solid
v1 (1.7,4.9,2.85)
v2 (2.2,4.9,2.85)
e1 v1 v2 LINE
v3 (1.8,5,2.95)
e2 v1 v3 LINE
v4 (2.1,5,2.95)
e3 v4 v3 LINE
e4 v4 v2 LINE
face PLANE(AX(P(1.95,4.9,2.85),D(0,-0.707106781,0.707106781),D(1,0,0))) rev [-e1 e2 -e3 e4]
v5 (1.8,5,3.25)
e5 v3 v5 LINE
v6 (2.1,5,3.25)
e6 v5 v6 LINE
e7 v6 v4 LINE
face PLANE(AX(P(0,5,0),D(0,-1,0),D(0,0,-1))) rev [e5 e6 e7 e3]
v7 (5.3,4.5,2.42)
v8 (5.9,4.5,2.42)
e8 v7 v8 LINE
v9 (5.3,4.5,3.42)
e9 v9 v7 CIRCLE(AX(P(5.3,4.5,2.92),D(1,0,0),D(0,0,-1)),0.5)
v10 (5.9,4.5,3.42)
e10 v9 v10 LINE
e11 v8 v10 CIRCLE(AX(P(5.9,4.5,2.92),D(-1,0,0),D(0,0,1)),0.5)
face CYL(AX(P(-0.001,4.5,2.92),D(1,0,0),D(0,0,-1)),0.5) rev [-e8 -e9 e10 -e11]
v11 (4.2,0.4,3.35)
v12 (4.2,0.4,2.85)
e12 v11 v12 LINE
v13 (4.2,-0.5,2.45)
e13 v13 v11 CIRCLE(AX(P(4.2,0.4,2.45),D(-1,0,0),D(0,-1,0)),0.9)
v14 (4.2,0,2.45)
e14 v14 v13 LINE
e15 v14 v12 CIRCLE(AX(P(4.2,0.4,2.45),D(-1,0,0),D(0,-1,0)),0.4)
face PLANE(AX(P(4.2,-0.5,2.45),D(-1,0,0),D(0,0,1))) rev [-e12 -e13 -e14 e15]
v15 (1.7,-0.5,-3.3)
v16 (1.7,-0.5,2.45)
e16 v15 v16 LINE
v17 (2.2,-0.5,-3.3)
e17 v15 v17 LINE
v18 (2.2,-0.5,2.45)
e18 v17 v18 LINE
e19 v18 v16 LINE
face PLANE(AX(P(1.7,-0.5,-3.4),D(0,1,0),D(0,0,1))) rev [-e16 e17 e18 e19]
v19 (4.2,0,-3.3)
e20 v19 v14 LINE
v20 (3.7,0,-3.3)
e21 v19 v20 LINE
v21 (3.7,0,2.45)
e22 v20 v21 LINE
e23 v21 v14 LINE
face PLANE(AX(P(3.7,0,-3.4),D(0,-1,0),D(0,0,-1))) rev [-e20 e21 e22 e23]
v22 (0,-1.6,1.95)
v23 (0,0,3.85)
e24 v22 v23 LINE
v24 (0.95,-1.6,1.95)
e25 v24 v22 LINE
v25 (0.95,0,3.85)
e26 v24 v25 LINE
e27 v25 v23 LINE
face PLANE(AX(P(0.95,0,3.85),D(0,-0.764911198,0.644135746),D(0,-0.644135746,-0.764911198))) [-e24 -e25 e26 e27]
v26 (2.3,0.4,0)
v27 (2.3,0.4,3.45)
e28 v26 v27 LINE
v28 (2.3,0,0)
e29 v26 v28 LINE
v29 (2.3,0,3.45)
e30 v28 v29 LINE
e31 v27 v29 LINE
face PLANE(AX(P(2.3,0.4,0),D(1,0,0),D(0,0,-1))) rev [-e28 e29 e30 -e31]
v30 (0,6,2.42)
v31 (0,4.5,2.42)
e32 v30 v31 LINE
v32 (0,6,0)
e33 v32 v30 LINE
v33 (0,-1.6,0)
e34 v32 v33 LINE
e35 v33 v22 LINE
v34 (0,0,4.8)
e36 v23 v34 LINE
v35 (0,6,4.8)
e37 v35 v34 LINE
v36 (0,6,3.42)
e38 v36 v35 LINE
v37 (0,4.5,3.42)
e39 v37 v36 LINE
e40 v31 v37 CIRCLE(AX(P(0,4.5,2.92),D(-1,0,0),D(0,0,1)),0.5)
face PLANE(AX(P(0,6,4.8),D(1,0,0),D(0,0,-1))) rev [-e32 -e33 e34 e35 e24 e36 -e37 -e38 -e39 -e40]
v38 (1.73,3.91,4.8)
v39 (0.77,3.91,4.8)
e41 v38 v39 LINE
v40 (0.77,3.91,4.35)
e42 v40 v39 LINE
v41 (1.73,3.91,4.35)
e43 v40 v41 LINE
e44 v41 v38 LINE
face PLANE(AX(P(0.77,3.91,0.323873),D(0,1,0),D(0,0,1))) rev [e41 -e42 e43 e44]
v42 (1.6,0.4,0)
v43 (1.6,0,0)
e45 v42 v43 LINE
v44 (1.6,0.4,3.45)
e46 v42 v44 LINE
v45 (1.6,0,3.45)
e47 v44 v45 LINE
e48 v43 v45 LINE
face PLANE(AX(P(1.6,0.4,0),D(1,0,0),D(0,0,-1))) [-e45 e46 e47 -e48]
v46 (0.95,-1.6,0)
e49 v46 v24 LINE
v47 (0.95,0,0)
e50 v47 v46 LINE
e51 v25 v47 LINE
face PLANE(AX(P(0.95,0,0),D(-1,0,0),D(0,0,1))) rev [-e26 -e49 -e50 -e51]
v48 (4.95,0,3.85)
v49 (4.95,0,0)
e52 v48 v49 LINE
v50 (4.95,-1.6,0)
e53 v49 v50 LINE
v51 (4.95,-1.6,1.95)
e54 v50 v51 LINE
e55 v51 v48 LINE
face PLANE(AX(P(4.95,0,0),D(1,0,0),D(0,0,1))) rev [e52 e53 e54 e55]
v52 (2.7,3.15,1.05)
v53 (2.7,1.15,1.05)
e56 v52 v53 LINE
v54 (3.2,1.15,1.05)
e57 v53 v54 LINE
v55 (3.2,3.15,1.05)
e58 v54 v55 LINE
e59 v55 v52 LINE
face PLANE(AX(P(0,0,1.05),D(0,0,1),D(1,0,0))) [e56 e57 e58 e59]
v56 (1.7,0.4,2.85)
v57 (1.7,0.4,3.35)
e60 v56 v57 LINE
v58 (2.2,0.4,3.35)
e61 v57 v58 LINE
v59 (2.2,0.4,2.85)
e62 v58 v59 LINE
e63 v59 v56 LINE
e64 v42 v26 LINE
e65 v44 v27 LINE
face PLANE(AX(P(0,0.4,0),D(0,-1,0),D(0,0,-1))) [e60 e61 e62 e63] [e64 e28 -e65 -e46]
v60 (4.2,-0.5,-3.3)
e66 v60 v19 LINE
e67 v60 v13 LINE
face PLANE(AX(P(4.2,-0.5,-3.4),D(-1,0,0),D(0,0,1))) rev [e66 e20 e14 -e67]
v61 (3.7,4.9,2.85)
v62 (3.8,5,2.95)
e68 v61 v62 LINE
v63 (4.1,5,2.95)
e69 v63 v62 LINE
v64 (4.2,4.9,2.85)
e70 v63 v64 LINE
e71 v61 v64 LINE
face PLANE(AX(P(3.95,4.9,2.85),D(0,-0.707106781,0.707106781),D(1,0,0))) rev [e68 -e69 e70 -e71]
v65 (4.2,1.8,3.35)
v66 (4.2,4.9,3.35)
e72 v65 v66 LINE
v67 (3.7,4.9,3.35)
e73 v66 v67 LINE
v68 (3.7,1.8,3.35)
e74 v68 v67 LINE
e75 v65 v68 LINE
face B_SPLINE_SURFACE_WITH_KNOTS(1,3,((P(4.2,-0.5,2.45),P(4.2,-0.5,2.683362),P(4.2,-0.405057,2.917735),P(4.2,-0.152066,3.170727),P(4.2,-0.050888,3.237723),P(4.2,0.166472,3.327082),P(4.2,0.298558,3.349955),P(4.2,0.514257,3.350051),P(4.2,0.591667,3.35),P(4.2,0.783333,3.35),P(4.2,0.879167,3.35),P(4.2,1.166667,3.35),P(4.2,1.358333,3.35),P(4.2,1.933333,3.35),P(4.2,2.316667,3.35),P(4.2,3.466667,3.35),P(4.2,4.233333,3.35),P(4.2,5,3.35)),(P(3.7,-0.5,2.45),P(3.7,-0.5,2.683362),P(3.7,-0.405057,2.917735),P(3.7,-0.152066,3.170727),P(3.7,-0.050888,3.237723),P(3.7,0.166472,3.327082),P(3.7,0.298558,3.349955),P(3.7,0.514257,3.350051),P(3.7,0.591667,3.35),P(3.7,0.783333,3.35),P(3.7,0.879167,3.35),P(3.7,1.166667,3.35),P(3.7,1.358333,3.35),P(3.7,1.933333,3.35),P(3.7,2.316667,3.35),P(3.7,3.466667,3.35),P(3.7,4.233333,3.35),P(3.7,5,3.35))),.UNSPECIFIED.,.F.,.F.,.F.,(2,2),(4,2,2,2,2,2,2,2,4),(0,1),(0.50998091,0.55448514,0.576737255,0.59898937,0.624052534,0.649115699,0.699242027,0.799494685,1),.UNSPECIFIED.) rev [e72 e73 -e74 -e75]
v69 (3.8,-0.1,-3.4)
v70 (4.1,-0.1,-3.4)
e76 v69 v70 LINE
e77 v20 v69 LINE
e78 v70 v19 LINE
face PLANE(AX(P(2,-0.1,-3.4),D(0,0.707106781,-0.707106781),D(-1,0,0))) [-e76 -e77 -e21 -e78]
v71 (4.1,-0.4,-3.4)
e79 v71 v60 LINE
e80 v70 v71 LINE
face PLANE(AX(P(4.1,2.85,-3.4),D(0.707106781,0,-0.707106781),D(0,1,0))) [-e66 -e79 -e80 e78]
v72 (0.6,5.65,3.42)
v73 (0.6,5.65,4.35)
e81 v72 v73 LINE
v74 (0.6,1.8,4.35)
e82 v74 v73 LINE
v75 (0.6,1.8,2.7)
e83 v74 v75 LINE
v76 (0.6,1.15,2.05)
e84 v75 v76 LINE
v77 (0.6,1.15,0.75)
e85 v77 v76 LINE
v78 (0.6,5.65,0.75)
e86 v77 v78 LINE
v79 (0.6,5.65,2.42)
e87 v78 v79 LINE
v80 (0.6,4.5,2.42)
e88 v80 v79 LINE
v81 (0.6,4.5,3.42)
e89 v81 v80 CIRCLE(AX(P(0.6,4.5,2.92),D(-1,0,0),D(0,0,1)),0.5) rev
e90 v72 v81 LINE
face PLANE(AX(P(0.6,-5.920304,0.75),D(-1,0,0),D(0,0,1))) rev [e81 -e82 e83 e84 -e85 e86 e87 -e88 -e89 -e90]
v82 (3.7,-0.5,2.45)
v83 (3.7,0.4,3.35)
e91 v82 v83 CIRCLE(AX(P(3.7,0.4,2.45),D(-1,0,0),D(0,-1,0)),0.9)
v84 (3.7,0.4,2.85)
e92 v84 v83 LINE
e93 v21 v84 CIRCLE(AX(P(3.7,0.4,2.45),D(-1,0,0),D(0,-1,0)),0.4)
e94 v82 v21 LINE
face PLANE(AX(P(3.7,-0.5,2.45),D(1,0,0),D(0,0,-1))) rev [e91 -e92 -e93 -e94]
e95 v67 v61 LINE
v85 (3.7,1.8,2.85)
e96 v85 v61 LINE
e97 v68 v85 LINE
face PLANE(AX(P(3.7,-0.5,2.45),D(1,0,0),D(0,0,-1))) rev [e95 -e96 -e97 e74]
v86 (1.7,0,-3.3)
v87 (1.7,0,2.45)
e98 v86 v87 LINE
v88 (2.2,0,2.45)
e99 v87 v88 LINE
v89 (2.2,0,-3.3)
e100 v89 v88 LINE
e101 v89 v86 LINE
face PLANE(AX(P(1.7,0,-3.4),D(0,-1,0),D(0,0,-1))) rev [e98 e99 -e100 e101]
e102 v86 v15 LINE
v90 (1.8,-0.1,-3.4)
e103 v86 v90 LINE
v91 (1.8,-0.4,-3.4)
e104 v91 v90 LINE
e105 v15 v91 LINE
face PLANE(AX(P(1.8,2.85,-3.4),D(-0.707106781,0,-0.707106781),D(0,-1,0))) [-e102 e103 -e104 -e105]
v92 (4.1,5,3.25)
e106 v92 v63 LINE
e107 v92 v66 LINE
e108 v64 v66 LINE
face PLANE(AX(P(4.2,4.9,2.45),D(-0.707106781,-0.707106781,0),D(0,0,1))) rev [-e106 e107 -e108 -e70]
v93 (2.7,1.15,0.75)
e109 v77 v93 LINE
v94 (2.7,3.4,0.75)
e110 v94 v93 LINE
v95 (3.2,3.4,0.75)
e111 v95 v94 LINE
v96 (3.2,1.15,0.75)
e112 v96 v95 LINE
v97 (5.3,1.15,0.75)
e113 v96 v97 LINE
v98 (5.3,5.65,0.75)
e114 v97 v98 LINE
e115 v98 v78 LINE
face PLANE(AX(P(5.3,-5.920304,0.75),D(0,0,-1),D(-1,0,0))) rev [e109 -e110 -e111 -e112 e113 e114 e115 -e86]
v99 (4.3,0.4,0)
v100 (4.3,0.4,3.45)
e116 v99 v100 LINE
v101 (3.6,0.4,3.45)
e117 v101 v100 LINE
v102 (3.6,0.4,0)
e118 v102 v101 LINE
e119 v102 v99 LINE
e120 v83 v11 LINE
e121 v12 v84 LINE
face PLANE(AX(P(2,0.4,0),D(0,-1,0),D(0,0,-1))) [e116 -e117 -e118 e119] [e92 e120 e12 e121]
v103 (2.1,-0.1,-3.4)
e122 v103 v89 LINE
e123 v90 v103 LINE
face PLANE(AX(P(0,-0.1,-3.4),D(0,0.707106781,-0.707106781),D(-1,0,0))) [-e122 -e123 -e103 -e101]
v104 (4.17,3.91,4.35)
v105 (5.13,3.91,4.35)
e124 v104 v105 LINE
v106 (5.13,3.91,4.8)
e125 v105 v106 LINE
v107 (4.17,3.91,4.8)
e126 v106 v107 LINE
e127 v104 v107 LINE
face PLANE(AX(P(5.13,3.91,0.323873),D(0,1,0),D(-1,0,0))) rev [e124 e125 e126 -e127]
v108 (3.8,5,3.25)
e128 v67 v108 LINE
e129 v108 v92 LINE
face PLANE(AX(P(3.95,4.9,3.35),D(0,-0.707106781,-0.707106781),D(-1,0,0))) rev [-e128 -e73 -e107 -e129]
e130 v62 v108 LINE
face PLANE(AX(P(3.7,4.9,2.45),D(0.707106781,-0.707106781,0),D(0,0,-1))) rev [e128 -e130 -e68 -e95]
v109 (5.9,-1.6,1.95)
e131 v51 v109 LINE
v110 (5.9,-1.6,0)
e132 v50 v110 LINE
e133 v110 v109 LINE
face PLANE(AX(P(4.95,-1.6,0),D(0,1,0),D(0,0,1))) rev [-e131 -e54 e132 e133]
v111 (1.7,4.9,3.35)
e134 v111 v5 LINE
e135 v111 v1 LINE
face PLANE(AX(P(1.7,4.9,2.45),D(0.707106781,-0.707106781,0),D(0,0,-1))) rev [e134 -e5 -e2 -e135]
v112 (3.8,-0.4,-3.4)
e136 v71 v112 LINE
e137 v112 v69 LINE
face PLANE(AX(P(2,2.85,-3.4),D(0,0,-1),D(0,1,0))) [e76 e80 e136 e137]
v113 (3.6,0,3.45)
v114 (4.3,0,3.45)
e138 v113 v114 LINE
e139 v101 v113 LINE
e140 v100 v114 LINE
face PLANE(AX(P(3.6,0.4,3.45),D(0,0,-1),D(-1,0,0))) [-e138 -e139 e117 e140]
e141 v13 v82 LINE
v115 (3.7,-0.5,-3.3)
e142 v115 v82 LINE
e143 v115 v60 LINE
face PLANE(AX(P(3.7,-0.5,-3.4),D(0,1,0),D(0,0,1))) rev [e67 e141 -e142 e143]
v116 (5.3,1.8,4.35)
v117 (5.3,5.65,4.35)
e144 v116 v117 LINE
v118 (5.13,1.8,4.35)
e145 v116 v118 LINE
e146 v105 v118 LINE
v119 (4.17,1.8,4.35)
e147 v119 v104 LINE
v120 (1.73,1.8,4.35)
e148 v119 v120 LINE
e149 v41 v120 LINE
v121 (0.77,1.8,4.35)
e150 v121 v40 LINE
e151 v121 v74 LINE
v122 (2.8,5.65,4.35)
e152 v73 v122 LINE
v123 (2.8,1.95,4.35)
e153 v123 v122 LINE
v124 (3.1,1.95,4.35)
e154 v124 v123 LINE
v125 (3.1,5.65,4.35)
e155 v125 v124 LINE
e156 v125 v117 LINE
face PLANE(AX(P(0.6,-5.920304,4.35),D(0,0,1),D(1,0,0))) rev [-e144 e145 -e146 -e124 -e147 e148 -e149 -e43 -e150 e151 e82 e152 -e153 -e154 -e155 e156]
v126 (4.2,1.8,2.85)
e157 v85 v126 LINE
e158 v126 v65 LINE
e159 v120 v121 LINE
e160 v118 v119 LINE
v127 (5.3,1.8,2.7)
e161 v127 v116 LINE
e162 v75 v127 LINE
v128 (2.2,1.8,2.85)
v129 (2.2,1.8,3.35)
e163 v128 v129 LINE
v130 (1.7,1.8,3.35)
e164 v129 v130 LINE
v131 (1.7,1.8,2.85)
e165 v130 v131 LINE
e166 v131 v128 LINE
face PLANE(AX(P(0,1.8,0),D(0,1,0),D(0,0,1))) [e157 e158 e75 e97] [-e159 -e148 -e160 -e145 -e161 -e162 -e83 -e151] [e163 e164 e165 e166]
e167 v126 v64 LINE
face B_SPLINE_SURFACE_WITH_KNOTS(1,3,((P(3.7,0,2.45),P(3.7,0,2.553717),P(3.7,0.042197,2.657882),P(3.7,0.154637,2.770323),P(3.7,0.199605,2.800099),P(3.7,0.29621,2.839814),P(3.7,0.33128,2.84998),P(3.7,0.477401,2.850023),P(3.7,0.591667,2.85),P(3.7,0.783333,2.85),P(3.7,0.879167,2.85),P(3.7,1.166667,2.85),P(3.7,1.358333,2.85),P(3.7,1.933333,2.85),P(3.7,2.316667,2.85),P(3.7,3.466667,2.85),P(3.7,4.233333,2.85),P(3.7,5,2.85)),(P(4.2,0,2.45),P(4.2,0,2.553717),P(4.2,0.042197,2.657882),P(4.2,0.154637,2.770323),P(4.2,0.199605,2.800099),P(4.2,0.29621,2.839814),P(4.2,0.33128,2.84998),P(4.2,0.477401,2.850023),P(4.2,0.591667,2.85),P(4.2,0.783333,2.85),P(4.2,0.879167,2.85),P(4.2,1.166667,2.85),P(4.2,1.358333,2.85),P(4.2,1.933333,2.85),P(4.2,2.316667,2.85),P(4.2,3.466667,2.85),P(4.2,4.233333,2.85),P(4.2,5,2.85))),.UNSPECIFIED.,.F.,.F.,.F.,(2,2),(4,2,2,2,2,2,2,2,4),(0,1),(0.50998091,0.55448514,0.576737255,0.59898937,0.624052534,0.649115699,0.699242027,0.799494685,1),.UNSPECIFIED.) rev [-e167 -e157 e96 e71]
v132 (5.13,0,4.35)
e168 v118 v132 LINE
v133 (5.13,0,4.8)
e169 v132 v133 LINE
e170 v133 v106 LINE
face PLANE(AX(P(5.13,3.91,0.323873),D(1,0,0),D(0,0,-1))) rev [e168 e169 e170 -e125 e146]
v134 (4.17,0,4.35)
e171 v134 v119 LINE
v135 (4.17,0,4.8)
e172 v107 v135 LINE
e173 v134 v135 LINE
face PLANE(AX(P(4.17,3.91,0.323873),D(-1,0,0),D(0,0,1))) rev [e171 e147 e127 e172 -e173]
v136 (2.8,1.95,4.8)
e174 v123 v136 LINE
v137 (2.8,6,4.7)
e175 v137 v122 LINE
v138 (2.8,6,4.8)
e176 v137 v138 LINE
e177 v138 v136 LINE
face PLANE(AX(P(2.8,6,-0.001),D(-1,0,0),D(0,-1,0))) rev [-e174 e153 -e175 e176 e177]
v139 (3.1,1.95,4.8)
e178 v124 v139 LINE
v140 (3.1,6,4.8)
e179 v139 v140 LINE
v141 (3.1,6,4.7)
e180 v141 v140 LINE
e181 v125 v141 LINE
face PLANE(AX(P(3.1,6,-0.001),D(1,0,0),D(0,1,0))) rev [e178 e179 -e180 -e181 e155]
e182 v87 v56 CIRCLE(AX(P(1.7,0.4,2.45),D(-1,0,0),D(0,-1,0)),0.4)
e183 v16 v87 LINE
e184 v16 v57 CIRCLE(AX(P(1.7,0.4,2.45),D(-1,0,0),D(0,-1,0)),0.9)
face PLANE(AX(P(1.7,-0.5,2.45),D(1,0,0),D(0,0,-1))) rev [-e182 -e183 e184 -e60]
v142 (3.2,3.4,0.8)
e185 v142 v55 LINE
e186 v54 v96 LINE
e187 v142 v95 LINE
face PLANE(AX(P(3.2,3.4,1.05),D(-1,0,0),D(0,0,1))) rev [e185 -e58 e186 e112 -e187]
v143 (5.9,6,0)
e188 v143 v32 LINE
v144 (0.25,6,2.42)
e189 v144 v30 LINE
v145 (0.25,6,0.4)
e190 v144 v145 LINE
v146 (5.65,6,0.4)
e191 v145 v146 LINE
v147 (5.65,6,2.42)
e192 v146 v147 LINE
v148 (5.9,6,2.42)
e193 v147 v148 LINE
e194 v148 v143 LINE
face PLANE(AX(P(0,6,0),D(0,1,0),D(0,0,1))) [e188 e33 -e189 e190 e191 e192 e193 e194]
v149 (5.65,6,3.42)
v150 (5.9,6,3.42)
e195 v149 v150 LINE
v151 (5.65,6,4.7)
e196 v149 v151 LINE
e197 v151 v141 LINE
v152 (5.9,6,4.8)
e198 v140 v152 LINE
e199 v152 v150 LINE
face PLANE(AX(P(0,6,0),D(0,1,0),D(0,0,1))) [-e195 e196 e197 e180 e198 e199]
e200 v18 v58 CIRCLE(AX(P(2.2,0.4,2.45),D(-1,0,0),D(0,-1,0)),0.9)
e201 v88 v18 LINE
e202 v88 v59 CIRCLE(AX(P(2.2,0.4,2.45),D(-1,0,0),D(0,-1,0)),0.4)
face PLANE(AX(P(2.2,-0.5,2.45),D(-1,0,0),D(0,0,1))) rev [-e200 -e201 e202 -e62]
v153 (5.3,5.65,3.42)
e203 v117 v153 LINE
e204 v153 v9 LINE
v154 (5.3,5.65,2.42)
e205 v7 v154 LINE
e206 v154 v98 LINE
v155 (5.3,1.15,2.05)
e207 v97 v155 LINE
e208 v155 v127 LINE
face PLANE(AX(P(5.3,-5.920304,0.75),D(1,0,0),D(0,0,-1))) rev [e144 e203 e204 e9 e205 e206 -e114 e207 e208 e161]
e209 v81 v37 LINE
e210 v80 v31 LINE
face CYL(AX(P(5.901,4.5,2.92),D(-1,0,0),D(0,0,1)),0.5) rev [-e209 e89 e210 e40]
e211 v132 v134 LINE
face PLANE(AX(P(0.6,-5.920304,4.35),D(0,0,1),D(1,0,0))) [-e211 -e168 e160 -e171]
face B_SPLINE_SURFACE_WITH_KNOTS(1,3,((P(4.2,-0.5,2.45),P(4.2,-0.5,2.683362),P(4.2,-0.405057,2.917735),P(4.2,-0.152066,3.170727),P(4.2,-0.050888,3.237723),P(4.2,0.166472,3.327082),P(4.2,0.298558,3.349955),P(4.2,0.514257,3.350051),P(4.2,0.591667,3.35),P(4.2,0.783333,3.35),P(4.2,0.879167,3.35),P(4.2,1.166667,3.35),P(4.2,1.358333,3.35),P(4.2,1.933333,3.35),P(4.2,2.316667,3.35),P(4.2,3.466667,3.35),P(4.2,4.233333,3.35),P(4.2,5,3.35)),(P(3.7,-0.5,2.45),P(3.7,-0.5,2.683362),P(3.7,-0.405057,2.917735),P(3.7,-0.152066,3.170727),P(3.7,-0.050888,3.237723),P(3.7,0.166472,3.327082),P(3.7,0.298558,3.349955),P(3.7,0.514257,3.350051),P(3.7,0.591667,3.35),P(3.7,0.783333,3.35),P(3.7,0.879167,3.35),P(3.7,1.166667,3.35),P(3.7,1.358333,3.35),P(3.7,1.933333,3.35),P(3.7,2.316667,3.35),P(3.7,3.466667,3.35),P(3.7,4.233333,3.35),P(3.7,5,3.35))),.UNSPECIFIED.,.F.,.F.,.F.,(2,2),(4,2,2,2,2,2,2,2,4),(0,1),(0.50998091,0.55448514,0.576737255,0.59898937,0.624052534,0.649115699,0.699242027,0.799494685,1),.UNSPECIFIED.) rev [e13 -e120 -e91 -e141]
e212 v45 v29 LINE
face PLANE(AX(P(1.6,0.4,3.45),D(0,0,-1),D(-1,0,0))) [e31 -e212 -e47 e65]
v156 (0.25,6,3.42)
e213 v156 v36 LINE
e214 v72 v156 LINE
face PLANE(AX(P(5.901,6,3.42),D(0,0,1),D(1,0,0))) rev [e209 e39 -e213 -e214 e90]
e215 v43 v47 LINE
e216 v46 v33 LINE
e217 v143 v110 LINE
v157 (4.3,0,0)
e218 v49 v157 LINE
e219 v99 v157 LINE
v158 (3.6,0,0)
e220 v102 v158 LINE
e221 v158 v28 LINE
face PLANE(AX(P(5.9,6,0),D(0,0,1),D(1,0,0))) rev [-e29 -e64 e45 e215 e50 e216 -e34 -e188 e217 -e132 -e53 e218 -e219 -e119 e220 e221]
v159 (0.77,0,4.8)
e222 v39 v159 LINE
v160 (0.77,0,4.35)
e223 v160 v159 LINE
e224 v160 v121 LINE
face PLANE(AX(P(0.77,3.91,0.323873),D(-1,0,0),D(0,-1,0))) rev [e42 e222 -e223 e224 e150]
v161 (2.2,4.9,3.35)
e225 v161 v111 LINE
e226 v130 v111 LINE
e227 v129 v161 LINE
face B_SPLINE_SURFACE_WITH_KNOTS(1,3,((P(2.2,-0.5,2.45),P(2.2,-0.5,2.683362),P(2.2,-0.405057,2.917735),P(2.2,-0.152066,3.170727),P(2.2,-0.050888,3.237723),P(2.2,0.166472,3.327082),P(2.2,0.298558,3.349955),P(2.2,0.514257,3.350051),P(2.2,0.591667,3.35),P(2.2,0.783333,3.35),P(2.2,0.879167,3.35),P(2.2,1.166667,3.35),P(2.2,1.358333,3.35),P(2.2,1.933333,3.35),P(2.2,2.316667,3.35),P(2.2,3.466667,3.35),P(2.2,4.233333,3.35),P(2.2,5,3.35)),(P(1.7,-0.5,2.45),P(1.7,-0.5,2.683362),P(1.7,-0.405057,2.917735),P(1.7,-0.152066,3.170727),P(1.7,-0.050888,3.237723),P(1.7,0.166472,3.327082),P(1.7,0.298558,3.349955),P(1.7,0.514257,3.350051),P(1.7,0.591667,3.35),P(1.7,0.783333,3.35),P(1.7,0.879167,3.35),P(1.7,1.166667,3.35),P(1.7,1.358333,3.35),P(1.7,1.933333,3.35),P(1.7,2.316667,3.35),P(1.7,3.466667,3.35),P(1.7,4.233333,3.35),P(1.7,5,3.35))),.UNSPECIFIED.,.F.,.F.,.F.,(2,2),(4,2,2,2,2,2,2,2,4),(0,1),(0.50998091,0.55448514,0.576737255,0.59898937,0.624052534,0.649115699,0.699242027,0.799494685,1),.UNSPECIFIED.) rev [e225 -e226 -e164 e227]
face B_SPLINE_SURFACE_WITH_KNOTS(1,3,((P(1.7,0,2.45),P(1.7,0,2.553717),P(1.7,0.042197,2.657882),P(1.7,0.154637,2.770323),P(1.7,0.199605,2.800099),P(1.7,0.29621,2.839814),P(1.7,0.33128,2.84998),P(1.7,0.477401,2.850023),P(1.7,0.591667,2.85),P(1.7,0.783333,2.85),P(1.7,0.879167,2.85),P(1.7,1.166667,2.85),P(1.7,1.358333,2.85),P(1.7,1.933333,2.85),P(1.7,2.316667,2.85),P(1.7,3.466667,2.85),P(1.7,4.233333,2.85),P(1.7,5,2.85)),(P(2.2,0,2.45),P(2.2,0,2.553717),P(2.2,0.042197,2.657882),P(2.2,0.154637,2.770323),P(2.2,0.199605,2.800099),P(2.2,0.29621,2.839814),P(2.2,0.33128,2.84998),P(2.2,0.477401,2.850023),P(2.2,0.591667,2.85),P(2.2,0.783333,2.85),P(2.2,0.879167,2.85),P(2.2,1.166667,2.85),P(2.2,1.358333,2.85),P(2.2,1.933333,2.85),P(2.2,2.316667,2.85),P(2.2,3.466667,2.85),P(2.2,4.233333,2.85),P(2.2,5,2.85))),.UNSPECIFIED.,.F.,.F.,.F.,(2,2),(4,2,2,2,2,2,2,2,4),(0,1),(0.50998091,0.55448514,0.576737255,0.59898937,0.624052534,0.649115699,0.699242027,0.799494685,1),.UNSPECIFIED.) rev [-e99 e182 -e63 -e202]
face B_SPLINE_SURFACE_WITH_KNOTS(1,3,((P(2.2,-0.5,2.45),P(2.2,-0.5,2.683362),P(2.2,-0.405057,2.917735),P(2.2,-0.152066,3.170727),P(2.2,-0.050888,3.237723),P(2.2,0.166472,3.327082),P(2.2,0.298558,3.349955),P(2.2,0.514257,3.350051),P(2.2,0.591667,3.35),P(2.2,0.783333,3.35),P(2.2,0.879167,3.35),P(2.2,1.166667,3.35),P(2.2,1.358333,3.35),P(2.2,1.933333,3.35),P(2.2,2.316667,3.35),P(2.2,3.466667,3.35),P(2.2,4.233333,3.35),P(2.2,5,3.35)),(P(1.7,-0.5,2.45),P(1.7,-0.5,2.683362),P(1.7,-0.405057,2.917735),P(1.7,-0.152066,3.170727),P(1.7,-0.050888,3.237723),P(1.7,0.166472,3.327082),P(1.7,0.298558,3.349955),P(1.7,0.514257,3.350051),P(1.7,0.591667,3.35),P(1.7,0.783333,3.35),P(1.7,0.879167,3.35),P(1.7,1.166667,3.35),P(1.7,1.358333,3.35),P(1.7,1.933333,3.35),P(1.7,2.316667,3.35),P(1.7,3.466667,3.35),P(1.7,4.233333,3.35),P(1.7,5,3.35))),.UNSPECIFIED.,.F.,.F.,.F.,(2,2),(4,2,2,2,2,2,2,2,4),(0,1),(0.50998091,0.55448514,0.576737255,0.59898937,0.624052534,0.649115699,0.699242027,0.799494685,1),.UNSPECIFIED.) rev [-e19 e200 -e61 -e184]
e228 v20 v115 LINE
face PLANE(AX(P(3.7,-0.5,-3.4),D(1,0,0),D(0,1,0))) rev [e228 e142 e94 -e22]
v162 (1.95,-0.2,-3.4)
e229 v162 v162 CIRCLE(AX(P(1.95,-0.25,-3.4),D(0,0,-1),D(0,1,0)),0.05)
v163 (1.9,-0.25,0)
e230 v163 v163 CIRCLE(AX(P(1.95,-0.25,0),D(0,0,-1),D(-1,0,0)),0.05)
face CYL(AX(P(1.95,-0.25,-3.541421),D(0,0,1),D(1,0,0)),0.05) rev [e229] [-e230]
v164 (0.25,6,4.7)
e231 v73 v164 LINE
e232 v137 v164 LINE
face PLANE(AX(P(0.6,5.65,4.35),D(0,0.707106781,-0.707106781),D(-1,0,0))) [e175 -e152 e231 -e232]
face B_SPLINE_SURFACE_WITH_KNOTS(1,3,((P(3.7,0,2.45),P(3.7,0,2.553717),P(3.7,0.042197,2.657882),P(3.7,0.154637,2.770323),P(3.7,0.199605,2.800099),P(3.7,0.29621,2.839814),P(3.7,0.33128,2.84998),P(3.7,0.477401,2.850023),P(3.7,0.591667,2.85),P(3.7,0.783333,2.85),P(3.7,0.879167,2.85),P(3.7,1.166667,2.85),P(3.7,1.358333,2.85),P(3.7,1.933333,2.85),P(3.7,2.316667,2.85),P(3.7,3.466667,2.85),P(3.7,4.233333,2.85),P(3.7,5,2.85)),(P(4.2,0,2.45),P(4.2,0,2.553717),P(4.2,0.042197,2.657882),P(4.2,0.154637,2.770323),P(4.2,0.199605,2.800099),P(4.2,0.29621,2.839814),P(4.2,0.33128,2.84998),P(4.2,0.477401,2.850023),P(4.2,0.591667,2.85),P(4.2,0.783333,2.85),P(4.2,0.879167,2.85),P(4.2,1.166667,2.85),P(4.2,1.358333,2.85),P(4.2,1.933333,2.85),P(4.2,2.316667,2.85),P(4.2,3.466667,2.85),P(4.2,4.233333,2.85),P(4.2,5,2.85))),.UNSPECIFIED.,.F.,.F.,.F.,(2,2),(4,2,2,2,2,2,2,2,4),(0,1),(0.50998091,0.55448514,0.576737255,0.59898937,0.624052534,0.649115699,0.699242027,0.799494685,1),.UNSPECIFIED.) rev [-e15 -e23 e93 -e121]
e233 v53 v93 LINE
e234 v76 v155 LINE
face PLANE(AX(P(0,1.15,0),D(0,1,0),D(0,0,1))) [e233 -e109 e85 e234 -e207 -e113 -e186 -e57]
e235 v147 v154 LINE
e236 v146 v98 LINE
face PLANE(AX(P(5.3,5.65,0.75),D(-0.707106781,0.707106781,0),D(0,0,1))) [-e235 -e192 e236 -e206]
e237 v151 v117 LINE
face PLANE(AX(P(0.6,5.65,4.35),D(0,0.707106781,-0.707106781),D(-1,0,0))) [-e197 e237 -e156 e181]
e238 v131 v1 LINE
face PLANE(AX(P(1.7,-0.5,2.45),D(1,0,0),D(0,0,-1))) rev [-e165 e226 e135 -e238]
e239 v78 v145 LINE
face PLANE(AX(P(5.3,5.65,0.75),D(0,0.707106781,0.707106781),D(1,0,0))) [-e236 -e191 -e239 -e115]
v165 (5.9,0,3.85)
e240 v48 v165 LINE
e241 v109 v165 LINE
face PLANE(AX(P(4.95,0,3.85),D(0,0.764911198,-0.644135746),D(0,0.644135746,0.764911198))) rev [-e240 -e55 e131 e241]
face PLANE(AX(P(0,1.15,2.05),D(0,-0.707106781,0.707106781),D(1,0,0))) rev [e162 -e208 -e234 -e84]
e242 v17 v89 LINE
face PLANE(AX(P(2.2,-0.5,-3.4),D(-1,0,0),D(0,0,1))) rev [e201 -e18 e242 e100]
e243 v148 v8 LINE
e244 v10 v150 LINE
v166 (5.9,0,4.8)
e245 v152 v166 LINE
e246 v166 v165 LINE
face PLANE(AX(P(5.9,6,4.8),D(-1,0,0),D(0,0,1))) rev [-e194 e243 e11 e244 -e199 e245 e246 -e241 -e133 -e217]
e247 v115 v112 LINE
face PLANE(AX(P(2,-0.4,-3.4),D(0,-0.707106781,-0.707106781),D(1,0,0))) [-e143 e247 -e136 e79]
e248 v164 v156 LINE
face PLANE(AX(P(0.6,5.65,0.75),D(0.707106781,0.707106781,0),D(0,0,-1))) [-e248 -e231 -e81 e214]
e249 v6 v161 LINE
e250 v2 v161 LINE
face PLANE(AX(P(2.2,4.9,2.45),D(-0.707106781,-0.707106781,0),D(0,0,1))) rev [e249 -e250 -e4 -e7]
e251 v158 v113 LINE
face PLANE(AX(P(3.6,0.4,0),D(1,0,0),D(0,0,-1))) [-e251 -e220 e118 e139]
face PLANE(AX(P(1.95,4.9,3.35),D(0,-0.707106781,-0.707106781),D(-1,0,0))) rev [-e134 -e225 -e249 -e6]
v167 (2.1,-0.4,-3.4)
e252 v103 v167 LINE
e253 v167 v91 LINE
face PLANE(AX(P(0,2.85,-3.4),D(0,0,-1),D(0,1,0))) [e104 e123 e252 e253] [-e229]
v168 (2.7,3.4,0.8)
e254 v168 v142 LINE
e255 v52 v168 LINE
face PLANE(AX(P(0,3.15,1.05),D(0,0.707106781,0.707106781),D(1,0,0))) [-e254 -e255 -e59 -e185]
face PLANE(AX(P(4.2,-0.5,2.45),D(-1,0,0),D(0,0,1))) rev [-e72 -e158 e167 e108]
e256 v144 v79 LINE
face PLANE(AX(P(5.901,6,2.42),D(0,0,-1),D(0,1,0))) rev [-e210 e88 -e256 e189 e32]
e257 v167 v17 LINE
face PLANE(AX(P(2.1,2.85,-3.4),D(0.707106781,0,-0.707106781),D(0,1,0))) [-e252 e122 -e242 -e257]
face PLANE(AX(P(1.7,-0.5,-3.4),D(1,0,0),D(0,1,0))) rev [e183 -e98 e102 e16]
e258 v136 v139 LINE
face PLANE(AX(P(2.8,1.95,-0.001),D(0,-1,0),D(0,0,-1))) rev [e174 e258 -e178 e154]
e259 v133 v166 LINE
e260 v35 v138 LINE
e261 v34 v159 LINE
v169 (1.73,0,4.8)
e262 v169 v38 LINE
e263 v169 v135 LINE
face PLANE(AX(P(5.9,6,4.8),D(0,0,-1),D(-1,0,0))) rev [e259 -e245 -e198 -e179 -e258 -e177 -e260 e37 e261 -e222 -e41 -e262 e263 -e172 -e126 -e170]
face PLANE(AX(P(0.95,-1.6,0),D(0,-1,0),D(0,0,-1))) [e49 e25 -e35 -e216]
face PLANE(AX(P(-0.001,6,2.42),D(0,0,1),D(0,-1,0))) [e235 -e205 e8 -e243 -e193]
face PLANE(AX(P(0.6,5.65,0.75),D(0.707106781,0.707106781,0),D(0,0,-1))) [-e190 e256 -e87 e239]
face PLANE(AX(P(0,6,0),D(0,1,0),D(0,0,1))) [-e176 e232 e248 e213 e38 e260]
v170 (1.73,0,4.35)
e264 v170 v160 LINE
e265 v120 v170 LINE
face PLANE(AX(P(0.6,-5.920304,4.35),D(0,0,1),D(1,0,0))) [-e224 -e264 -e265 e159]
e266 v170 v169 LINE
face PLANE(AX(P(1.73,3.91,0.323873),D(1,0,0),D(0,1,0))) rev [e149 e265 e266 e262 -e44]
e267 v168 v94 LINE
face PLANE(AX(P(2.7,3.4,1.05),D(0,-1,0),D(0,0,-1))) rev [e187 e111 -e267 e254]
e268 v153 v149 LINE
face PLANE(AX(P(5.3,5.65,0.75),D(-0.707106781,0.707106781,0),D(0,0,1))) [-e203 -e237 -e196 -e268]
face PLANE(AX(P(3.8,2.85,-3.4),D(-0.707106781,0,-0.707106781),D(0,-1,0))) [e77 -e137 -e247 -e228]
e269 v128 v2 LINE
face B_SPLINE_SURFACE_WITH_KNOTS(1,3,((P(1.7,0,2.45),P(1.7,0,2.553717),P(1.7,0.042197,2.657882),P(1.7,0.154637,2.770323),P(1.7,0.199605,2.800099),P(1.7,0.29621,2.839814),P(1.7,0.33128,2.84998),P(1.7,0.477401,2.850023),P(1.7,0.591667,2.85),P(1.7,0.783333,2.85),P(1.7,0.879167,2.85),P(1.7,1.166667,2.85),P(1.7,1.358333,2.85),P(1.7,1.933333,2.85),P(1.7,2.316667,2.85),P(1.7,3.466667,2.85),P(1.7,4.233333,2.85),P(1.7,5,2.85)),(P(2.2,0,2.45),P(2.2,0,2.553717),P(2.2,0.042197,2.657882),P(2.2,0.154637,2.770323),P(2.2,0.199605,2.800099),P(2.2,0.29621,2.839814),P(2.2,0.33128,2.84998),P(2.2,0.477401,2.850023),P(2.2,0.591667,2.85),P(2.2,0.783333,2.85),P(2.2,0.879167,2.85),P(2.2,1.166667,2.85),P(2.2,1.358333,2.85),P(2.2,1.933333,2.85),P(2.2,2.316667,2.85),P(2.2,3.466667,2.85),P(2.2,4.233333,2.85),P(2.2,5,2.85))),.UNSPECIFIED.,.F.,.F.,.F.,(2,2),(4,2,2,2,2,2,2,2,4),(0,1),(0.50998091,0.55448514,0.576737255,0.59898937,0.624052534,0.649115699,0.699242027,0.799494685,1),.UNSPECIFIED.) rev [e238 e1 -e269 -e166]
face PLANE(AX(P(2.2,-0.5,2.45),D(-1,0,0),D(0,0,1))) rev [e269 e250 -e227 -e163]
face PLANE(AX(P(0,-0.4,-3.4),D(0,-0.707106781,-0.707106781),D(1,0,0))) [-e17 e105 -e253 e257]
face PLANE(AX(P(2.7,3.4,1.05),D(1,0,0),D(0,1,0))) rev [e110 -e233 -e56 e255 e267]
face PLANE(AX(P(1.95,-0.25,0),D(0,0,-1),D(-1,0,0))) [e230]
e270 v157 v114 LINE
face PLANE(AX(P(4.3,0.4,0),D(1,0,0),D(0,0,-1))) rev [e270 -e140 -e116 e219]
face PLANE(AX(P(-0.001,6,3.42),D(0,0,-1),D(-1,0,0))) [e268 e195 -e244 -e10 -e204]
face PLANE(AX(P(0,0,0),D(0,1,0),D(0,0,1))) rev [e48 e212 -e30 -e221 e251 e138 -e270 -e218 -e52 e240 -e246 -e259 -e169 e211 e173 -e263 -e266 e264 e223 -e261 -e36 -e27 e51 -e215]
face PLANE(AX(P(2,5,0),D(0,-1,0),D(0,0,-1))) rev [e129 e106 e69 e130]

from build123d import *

# Parameters (mm, degrees)
BODY1_W                            = 5.9
BODY1_H                            = 4.8
EXTRUDE_1_DEPTH                    = 6
SKETCH_2_W                         = 4.7
SKETCH_2_H                         = 3.6
CUT_EXTRUDE_1_DEPTH                = 4.2
CHAMFER_1_SIZE                     = 0.35
SKETCH_4_W                         = 0.96
SKETCH_4_H                         = 3.91
CUT_EXTRUDE_3_DEPTH                = 0.45
SKETCH_5_W                         = 0.7
SKETCH_5_H                         = 3.45
CUT_EXTRUDE_4_DEPTH                = 0.4
CUT_EXTRUDE_6_REACH                = 11.688
SKETCH_8_W                         = 0.3
SKETCH_8_H                         = 4.05
CUT_EXTRUDE_7_REACH                = 11.688
SKETCH_15_W                        = 4.7
SKETCH_15_H                        = 1.95
CUT_EXTRUDE_9_DEPTH                = 0.65
CHAMFER_7_SIZE                     = 0.65
SKETCH_10_W                        = 0.5
SKETCH_10_H                        = 2.25
EXTRUDE_2_DEPTH                    = 0.3
CHAMFER_2_SIZE                     = 0.25
EXTRUDE_5_DEPTH                    = 0.95
SWEEP_START                        = 1.7
SWEEP_1_DEPTH                      = 0.5
CHAMFER_8_SIZE                     = 0.1
PATTERN_LINEAR_5_COUNT             = 2
PATTERN_LINEAR_5_PITCH             = 2
CHAMFER_8_OF_PATTERN_LINEAR_5_SIZE = 0.1
SKETCH_18_R                        = 0.05
CUT_EXTRUDE_10_DEPTH               = 3.4


# Read off the part's stored shape, not the designer's step: По траектории1
with BuildPart() as part:
    # Body1 → Бобышка-Вытянуть1 (new body)
    with BuildSketch(Plane(origin=(0, 0, 0), x_dir=(1, 0, 0), z_dir=(0, 1, 0))):
        with Locations((2.95, -2.4)):
            Rectangle(BODY1_W, BODY1_H)
    extrude(amount=EXTRUDE_1_DEPTH)

    # Эскиз2 → Вырез-Вытянуть1 (cut)
    with BuildSketch(Plane(origin=(0, 6, 0), x_dir=(1, 0, 0), z_dir=(0, 1, 0))):
        with Locations((2.95, -2.55)):
            Rectangle(SKETCH_2_W, SKETCH_2_H)
    extrude(amount=-CUT_EXTRUDE_1_DEPTH, mode=Mode.SUBTRACT)

    # Фаска1
    chamfer_1_edges = [part.edges().sort_by_distance(p)[0] for p in [
        (5.3, 6, 2.55),
        (2.95, 6, 0.75),
        (0.6, 6, 2.55),
        (2.95, 6, 4.35),
    ]]
    chamfer(chamfer_1_edges, length=CHAMFER_1_SIZE)

    # Эскиз4 → Вырез-Вытянуть3 (cut)
    with BuildSketch(Plane.XY.offset(4.8)):
        with Locations((1.25, 1.955)):
            Rectangle(SKETCH_4_W, SKETCH_4_H)
        with Locations((4.65, 1.955)):
            Rectangle(SKETCH_4_W, SKETCH_4_H)
    extrude(amount=-CUT_EXTRUDE_3_DEPTH, mode=Mode.SUBTRACT)

    # Эскиз5 → Вырез-Вытянуть4 (cut)
    with BuildSketch(Plane(origin=(0, 0, 4.8), x_dir=(1, 0, 0), z_dir=(0, 1, 0))):
        with Locations((1.95, 3.075)):
            Rectangle(SKETCH_5_W, SKETCH_5_H)
    cut_extrude_4 = extrude(amount=CUT_EXTRUDE_4_DEPTH, mode=Mode.SUBTRACT)

    # Эскиз8 → Вырез-Вытянуть6 (cut, up to next)
    with BuildSketch(Plane.XY.offset(4.8), mode=Mode.PRIVATE) as cut_extrude_6_sk1:
        with Locations((2.95, 3.975)):
            Rectangle(SKETCH_8_W, SKETCH_8_H)
    cut_extrude_6_tool1 = extrude(cut_extrude_6_sk1.sketch, amount=-CUT_EXTRUDE_6_REACH, mode=Mode.PRIVATE) & part.part
    add(cut_extrude_6_tool1.solids().sort_by_distance((2.95, 3.975, 4.8))[0], mode=Mode.SUBTRACT)

    # Эскиз9 → Вырез-Вытянуть7 (cut, up to next)
    with BuildSketch(Plane.ZY, mode=Mode.PRIVATE) as cut_extrude_7_sk1:
        with BuildLine():
            Line((2.42, 6), (3.42, 6))
            Line((3.42, 6), (3.42, 4.5))
            ThreePointArc((3.42, 4.5), (2.92, 4), (2.42, 4.5))
            Line((2.42, 4.5), (2.42, 6))
        make_face()
    cut_extrude_7_tool1 = extrude(cut_extrude_7_sk1.sketch, amount=-CUT_EXTRUDE_7_REACH, mode=Mode.PRIVATE) & part.part
    cut_extrude_7 = cut_extrude_7_tool1.solids().sort_by_distance((0, 5.05036, 2.92))[0]
    add(cut_extrude_7, mode=Mode.SUBTRACT)

    # Зеркальное отражение1: Вырез-Вытянуть7 across plane
    add(cut_extrude_7.mirror(Plane(origin=(2.95, 0, 0), x_dir=(0, 0, 1), z_dir=(1, 0, 0))), mode=Mode.SUBTRACT)

    # Эскиз15 → Вырез-Вытянуть9 (cut)
    with BuildSketch(Plane(origin=(0, 1.8, 0), x_dir=(1, 0, 0), z_dir=(0, 1, 0))):
        with Locations((2.95, -1.725)):
            Rectangle(SKETCH_15_W, SKETCH_15_H)
    extrude(amount=-CUT_EXTRUDE_9_DEPTH, mode=Mode.SUBTRACT)

    # Фаска7
    chamfer_7_edges = [part.edges().sort_by_distance(p)[0] for p in [
        (2.95, 1.15, 2.7),
    ]]
    chamfer(chamfer_7_edges, length=CHAMFER_7_SIZE - 0.0001)  # a hair under: the kernel refuses the full size

    # Эскиз10 → Бобышка-Вытянуть2 (add)
    with BuildSketch(Plane.XY.offset(0.75)):
        with Locations((2.95, 2.275)):
            Rectangle(SKETCH_10_W, SKETCH_10_H)
    extrude(amount=EXTRUDE_2_DEPTH)

    # Фаска2
    chamfer_2_edges = [part.edges().sort_by_distance(p)[0] for p in [
        (2.95, 3.4, 1.05),
    ]]
    chamfer(chamfer_2_edges, length=CHAMFER_2_SIZE)

    # Эскиз17 → Бобышка-Вытянуть5 (add)
    with BuildSketch(Plane.ZY):
        Polygon((0, -1.6), (1.95, -1.6), (3.85, 0), (0, 0), align=None)
    extrude_5 = extrude(amount=-EXTRUDE_5_DEPTH)

    # Зеркальное отражение3: Бобышка-Вытянуть5 across plane
    add(extrude_5.mirror(Plane(origin=(2.95, 0, 0), x_dir=(0, 0, 1), z_dir=(1, 0, 0))))

    # По траектории1 outline → По траектории1 (add)
    with BuildSketch(Plane.YZ.offset(SWEEP_START)):
        with BuildLine():
            add(Edge.make_bspline(
                [(-0.5, 2.45), (-0.5, 2.683362296), (-0.405057001, 2.917735205), (-0.152065654, 3.170726552), (-0.050887811, 3.237723146), (0.166472235, 3.327081743), (0.298557942, 3.349954697), (0.4, 3.35)],
                knots=[0.50998091, 0.50998091, 0.50998091, 0.50998091, 0.55448514, 0.55448514, 0.576737255, 0.576737255, 0.59898937, 0.59898937, 0.59898937, 0.59898937], degree=3))
            Line((-0.5, 2.45), (-0.5, -3.4))
            Line((-0.5, -3.4), (0, -3.4))
            Line((0, -3.4), (0, 2.45))
            add(Edge.make_bspline(
                [(0, 2.45), (0, 2.553716576), (0.042196888, 2.657882313), (0.154637487, 2.770322912), (0.199605417, 2.800099176), (0.296209882, 2.839814108), (0.331279974, 2.849979865), (0.4, 2.85)],
                knots=[0.50998091, 0.50998091, 0.50998091, 0.50998091, 0.55448514, 0.55448514, 0.576737255, 0.576737255, 0.59898937, 0.59898937, 0.59898937, 0.59898937], degree=3))
            Line((0.4, 2.85), (0.4, 3.35))
        make_face()
        with BuildLine():
            Line((1.8, 3.35), (1.8, 2.85))
            add(Edge.make_bspline(
                [(1.8, 2.85), (2.1, 2.85), (2.4, 2.85), (3.466666667, 2.85), (4.233333333, 2.85), (5, 2.85)],
                knots=[0.721036083, 0.721036083, 0.721036083, 0.721036083, 0.799494685, 0.799494685, 1, 1, 1, 1], degree=3))
            Line((5, 2.85), (5, 3.35))
            add(Edge.make_bspline(
                [(1.8, 3.35), (2.1, 3.35), (2.4, 3.35), (3.466666667, 3.35), (4.233333333, 3.35), (5, 3.35)],
                knots=[0.721036083, 0.721036083, 0.721036083, 0.721036083, 0.799494685, 0.799494685, 1, 1, 1, 1], degree=3))
        make_face()
    sweep_1 = extrude(amount=SWEEP_1_DEPTH)

    # Фаска8
    chamfer_8_edges = [part.edges().sort_by_distance(p)[0] for p in [
        (1.95, 5, 2.85),
        (2.2, 5, 3.1),
        (1.95, 5, 3.35),
        (1.7, 5, 3.1),
        (1.95, -0.5, -3.4),
        (2.2, -0.25, -3.4),
        (1.95, 0, -3.4),
        (1.7, -0.25, -3.4),
    ]]
    chamfer(chamfer_8_edges, length=CHAMFER_8_SIZE)

    # Линейный массив5: Вырез-Вытянуть4, По траектории1 ×2
    with Locations(*[(i * PATTERN_LINEAR_5_PITCH, 0, 0) for i in range(1, PATTERN_LINEAR_5_COUNT)]):
        add(cut_extrude_4, mode=Mode.SUBTRACT)
        add(sweep_1)

    # Фаска8 of Линейный массив5
    chamfer_8_of_pattern_linear_5_edges = [part.edges().sort_by_distance(p)[0] for p in [
        (3.95, 5, 2.85),
        (4.2, 5, 3.1),
        (3.95, 5, 3.35),
        (3.7, 5, 3.1),
        (3.95, -0.5, -3.4),
        (4.2, -0.25, -3.4),
        (3.95, 0, -3.4),
        (3.7, -0.25, -3.4),
    ]]
    chamfer(chamfer_8_of_pattern_linear_5_edges, length=CHAMFER_8_OF_PATTERN_LINEAR_5_SIZE)

    # Эскиз18 → Вырез-Вытянуть10 (cut)
    with BuildSketch(Plane(origin=(0, 0, 0), x_dir=(-1, 0, 0), z_dir=(0, 0, -1))):
        with Locations(Location((-1.95, -0.25, 0), (0, 0, 90))):
            Circle(SKETCH_18_R)
    extrude(amount=CUT_EXTRUDE_10_DEPTH, mode=Mode.SUBTRACT)


solid = part.part
